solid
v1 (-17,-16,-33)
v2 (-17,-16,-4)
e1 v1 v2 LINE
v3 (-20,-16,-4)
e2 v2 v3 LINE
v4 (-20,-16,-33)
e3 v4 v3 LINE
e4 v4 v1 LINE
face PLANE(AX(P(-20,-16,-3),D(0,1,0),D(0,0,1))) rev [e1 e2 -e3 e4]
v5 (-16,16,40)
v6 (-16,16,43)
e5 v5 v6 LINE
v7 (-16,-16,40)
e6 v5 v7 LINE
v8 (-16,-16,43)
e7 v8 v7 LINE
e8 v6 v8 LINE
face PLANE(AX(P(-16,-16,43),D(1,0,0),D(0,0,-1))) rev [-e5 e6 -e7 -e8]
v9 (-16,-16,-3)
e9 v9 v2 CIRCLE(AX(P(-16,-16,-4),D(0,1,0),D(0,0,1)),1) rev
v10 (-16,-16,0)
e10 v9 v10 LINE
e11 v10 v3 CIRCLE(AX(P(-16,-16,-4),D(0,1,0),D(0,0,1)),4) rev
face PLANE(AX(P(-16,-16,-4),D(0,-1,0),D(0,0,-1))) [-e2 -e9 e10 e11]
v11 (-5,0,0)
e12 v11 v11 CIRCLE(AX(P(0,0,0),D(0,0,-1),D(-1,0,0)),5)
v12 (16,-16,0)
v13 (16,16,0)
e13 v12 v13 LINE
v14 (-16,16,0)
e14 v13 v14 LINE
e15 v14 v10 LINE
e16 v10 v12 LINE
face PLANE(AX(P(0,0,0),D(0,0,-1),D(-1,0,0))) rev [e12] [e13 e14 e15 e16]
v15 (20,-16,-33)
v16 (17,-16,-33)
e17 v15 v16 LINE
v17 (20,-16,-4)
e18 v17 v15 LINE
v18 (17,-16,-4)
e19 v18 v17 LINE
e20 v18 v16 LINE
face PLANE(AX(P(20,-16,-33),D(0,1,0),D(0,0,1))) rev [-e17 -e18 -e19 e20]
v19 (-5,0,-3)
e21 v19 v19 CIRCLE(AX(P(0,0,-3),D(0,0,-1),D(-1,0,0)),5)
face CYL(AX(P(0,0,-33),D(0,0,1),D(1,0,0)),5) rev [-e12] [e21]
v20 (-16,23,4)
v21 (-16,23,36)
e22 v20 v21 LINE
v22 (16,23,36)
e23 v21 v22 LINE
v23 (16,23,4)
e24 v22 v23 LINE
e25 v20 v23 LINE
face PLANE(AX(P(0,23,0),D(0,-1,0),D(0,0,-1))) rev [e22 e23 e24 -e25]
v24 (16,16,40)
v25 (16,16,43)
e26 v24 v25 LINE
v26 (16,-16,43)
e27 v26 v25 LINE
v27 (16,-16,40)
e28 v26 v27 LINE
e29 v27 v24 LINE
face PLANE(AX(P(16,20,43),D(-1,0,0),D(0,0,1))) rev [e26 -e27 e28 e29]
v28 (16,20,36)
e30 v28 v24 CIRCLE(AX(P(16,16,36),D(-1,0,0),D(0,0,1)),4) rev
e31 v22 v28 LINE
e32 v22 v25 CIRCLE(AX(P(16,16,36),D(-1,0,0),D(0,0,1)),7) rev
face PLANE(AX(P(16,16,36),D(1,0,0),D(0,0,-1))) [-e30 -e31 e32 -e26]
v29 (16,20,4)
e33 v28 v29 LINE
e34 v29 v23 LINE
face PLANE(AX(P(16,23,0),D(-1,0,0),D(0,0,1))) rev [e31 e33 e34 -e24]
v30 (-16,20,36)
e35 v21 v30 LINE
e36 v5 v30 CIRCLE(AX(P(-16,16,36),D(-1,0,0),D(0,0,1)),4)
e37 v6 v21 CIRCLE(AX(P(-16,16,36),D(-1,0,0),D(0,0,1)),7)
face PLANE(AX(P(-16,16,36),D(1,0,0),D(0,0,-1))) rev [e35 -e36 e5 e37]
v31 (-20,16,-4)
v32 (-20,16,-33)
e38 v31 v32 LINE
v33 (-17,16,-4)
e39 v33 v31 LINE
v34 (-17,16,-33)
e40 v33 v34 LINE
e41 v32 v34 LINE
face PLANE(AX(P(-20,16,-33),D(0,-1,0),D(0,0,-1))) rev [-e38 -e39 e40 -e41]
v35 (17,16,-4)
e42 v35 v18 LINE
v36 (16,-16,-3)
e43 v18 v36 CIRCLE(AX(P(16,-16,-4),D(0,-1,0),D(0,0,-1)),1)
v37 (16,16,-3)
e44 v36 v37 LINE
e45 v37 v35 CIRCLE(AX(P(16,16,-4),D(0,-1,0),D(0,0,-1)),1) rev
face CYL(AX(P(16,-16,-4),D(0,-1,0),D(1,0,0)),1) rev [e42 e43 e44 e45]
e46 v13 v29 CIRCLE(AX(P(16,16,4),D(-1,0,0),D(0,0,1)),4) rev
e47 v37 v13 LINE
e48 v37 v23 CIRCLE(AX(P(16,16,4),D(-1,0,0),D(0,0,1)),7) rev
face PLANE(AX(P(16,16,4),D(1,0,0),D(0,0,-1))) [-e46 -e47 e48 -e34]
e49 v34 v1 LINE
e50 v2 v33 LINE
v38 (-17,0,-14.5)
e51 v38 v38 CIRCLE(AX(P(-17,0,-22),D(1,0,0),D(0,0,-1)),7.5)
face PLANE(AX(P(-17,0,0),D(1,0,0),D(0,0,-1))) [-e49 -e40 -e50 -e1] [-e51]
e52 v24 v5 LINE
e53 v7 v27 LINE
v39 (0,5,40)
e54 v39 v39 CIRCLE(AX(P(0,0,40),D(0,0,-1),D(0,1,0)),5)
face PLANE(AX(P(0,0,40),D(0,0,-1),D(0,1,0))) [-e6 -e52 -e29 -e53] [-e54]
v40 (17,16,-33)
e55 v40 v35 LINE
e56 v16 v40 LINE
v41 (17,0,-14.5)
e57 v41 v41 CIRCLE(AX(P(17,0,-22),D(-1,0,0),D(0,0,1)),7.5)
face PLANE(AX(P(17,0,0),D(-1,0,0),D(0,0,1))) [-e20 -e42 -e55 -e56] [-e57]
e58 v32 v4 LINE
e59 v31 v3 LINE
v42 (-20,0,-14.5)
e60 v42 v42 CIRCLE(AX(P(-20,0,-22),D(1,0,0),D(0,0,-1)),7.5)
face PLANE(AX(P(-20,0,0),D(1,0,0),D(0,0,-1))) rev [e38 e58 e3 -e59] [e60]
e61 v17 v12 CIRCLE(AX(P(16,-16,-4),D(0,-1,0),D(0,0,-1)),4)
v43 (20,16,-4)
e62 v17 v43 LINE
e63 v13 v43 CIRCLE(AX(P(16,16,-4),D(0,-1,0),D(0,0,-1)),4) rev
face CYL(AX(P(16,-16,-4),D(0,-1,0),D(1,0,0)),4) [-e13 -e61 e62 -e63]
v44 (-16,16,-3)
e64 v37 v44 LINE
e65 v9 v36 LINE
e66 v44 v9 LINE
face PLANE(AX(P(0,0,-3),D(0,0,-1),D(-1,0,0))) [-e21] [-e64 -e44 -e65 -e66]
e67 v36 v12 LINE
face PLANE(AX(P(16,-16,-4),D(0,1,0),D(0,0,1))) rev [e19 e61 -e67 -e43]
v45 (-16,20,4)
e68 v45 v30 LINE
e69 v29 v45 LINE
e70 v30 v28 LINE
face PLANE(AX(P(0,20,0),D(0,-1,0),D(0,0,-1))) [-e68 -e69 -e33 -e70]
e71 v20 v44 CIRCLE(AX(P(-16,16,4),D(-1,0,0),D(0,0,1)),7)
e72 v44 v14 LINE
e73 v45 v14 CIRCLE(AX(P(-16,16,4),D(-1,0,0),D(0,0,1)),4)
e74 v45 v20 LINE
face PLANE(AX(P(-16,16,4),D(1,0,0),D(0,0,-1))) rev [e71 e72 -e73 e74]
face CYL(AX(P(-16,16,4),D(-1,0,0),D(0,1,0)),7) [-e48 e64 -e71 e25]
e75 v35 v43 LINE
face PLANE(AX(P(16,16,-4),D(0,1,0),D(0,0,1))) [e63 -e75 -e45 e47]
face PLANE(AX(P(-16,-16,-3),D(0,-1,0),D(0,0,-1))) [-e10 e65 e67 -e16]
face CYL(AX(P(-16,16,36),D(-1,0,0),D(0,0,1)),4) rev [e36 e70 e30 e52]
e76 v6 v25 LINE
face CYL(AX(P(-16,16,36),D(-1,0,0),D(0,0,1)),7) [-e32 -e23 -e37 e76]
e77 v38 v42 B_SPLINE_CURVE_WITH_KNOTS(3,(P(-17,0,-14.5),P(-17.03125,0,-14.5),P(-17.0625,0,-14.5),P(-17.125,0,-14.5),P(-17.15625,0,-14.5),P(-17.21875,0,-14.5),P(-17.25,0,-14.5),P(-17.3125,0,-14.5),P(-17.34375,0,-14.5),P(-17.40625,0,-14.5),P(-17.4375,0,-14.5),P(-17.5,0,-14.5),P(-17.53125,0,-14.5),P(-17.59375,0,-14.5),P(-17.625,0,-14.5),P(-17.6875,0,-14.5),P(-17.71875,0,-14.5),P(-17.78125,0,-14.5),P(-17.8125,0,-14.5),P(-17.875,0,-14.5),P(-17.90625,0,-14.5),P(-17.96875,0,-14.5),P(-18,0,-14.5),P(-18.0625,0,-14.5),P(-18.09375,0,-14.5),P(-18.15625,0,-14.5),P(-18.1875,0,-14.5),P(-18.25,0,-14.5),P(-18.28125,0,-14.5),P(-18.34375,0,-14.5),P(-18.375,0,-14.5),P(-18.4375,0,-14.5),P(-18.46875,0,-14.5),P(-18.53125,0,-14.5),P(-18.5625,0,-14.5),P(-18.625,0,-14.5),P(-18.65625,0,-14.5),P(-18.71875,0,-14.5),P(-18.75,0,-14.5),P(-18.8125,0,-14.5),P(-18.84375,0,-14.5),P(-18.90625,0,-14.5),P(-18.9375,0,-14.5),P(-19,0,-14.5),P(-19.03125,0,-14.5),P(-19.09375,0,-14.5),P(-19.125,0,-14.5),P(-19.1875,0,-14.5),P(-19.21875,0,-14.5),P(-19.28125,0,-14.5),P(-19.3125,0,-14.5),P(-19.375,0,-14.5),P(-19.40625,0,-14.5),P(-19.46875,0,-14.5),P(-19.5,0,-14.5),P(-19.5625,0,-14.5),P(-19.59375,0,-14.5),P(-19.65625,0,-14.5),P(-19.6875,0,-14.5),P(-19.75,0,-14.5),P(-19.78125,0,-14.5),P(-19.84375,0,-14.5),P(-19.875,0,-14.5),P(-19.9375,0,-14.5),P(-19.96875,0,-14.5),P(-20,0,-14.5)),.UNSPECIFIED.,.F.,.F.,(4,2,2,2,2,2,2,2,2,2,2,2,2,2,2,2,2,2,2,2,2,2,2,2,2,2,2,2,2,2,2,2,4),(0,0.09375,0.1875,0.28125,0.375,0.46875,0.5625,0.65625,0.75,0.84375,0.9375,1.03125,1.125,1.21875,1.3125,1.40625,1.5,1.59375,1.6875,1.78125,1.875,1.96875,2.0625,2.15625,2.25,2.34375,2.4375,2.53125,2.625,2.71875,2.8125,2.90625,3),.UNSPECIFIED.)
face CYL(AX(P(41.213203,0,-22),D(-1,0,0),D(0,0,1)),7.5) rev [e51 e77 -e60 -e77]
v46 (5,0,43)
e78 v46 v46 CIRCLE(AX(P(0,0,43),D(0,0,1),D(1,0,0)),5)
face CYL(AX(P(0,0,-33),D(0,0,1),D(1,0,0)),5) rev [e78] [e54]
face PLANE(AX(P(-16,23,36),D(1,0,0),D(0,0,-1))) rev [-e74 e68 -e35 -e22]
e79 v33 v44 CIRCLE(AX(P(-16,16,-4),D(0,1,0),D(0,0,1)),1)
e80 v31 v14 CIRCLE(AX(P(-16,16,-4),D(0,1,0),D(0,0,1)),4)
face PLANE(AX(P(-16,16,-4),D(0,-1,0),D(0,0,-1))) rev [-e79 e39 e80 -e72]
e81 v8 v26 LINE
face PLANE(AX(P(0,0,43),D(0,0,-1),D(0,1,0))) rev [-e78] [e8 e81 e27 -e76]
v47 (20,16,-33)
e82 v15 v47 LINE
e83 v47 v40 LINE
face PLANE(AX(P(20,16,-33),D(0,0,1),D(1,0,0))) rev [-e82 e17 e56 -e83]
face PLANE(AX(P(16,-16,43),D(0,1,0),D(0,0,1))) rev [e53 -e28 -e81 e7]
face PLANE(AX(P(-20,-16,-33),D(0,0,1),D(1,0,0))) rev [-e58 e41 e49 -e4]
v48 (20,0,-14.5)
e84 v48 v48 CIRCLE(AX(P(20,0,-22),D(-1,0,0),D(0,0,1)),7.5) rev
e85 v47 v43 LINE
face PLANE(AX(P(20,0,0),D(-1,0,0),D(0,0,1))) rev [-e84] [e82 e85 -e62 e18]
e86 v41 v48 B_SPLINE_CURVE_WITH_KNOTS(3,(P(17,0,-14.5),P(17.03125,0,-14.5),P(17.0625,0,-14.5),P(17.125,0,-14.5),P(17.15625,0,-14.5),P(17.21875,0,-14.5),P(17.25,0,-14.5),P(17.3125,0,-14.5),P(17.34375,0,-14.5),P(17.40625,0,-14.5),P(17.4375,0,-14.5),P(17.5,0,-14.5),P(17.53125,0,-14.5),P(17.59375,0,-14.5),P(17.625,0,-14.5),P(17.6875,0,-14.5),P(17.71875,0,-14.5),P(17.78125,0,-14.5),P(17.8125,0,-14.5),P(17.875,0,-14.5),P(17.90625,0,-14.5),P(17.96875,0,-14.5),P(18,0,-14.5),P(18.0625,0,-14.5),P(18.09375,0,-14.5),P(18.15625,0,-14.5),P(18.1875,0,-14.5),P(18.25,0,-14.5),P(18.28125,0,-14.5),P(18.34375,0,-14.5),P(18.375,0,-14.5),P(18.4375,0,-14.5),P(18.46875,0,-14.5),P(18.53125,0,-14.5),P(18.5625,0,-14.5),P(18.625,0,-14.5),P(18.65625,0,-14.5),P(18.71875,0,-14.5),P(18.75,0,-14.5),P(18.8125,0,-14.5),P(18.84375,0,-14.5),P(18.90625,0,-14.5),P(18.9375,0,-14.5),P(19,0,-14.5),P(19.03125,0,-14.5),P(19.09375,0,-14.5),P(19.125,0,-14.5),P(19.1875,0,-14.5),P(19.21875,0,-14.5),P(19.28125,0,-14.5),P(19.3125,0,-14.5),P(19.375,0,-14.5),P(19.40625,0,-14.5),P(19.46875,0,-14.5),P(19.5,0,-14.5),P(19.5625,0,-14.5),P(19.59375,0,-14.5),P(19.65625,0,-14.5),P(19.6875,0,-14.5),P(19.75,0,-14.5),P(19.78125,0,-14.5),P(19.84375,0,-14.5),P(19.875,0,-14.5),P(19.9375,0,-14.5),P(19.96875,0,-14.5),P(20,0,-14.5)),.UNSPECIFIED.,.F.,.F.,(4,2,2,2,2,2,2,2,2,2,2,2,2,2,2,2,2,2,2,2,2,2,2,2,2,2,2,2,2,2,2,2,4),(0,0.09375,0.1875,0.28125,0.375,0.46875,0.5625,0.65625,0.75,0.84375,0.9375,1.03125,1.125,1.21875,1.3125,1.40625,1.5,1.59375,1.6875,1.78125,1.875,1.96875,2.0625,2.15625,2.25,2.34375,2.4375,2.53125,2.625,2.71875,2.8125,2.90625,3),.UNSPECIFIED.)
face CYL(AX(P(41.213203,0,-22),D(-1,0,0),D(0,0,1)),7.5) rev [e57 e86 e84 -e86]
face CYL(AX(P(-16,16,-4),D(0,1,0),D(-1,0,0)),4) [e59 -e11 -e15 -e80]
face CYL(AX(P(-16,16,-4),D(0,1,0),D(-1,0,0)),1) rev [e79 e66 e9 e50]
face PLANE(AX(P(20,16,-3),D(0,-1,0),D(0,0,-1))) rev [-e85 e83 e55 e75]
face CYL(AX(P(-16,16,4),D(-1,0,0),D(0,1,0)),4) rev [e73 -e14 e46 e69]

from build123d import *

# Parameters (mm, degrees)
SKETCH1_W                      = 32
SKETCH1_H                      = 32
BASE_FLANGE1_DEPTH             = 3
KENAR_FLAN_1_DEPTH             = 32
KENAR_FLAN_2_DEPTH             = 32
KENAR_FLAN_3_DEPTH             = 32
KENAR_FLAN_4_DEPTH             = 32
SKETCH20_R                     = 5
CUT_EXTRUDE1_DEPTH             = 82.884064384
CUT_EXTRUDE2_REACH             = 65.071
SKETCH21_R                     = 7.5
CUT_EXTRUDE2_DIRECTION_2_DEPTH = 64.071388125


# Sheet-metal steps are written as plain solids
with BuildPart() as part:
    # Sketch1 → Base-Flange1 (new body)
    with BuildSketch(Plane.XY):
        Rectangle(SKETCH1_W, SKETCH1_H)
    extrude(amount=-BASE_FLANGE1_DEPTH)

    # Kenar-Flanş1 section (across the edge) → Kenar-Flanş1 (add)
    with BuildSketch(Plane(origin=(16, 20, 0), x_dir=(0, -1, 0), z_dir=(-1, 0, 0))):
        with BuildLine():
            Line((-3, 4), (-3, 36))
            Line((-3, 36), (0, 36))
            Line((0, 36), (0, 4))
            ThreePointArc((0, 4), (1.171572875, 1.171572875), (4, 0))
            Line((4, 0), (4, -3))
            ThreePointArc((4, -3), (-0.949747468, -0.949747468), (-3, 4))
        make_face()
    extrude(amount=KENAR_FLAN_1_DEPTH)

    # Kenar-Flanş2 section (across the edge) → Kenar-Flanş2 (add)
    with BuildSketch(Plane(origin=(16, 20, 40), x_dir=(0, 0, -1), z_dir=(-1, 0, 0))):
        with BuildLine():
            Line((-3, 4), (-3, 36))
            Line((-3, 36), (0, 36))
            Line((0, 36), (0, 4))
            ThreePointArc((0, 4), (1.171572875, 1.171572875), (4, 0))
            Line((4, 0), (4, -3))
            ThreePointArc((4, -3), (-0.949747468, -0.949747468), (-3, 4))
        make_face()
    extrude(amount=KENAR_FLAN_2_DEPTH)

    # Kenar-Flanş3 section (across the edge) → Kenar-Flanş3 (add)
    with BuildSketch(Plane(origin=(-17, -16, -3), x_dir=(1, 0, 0), z_dir=(0, 1, 0))):
        with BuildLine():
            Line((-3, 1), (-3, 30))
            Line((-3, 30), (0, 30))
            Line((0, 30), (0, 1))
            ThreePointArc((0, 1), (0.292893219, 0.292893219), (1, 0))
            Line((1, 0), (1, -3))
            ThreePointArc((1, -3), (-1.828427125, -1.828427125), (-3, 1))
        make_face()
    extrude(amount=KENAR_FLAN_3_DEPTH)

    # Kenar-Flanş4 section (across the edge) → Kenar-Flanş4 (add)
    with BuildSketch(Plane(origin=(17, 16, -3), x_dir=(-1, 0, 0), z_dir=(0, -1, 0))):
        with BuildLine():
            Line((-3, 1), (-3, 30))
            Line((-3, 30), (0, 30))
            Line((0, 30), (0, 1))
            ThreePointArc((0, 1), (0.292893219, 0.292893219), (1, 0))
            Line((1, 0), (1, -3))
            ThreePointArc((1, -3), (-1.828427125, -1.828427125), (-3, 1))
        make_face()
    extrude(amount=KENAR_FLAN_4_DEPTH)

    # Sketch20 → Cut-Extrude1 (cut, through all)
    with BuildSketch(Plane.XY.offset(43)):
        Circle(SKETCH20_R)
    extrude(amount=-CUT_EXTRUDE1_DEPTH, mode=Mode.SUBTRACT)

    # Cut-Extrude2: up to this face of the body (flat: up to its plane)
    cut_extrude2_end = Plane(part.part.faces().sort_by_distance((20, 0, -18.5))[0])
    # Sketch21 → Cut-Extrude2 (cut, up to the picked face)
    with BuildSketch(Plane.ZY.offset(20), mode=Mode.PRIVATE) as cut_extrude2_sk1:
        with Locations((-22, 0)):
            Circle(SKETCH21_R)
    cut_extrude2_tool1 = split(extrude(cut_extrude2_sk1.sketch, amount=-CUT_EXTRUDE2_REACH, mode=Mode.PRIVATE), bisect_by=cut_extrude2_end, keep=Keep.BOTH, mode=Mode.PRIVATE)
    add(cut_extrude2_tool1.solids().sort_by(Axis((-20, 0, -22), (1, 0, 0)))[0], mode=Mode.SUBTRACT)

    # Sketch21 → Cut-Extrude2 direction 2 (cut)
    with BuildSketch(Plane.ZY.offset(20)):
        with Locations((-22, 0)):
            Circle(SKETCH21_R)
    extrude(amount=CUT_EXTRUDE2_DIRECTION_2_DEPTH, mode=Mode.SUBTRACT)


solid = part.part
